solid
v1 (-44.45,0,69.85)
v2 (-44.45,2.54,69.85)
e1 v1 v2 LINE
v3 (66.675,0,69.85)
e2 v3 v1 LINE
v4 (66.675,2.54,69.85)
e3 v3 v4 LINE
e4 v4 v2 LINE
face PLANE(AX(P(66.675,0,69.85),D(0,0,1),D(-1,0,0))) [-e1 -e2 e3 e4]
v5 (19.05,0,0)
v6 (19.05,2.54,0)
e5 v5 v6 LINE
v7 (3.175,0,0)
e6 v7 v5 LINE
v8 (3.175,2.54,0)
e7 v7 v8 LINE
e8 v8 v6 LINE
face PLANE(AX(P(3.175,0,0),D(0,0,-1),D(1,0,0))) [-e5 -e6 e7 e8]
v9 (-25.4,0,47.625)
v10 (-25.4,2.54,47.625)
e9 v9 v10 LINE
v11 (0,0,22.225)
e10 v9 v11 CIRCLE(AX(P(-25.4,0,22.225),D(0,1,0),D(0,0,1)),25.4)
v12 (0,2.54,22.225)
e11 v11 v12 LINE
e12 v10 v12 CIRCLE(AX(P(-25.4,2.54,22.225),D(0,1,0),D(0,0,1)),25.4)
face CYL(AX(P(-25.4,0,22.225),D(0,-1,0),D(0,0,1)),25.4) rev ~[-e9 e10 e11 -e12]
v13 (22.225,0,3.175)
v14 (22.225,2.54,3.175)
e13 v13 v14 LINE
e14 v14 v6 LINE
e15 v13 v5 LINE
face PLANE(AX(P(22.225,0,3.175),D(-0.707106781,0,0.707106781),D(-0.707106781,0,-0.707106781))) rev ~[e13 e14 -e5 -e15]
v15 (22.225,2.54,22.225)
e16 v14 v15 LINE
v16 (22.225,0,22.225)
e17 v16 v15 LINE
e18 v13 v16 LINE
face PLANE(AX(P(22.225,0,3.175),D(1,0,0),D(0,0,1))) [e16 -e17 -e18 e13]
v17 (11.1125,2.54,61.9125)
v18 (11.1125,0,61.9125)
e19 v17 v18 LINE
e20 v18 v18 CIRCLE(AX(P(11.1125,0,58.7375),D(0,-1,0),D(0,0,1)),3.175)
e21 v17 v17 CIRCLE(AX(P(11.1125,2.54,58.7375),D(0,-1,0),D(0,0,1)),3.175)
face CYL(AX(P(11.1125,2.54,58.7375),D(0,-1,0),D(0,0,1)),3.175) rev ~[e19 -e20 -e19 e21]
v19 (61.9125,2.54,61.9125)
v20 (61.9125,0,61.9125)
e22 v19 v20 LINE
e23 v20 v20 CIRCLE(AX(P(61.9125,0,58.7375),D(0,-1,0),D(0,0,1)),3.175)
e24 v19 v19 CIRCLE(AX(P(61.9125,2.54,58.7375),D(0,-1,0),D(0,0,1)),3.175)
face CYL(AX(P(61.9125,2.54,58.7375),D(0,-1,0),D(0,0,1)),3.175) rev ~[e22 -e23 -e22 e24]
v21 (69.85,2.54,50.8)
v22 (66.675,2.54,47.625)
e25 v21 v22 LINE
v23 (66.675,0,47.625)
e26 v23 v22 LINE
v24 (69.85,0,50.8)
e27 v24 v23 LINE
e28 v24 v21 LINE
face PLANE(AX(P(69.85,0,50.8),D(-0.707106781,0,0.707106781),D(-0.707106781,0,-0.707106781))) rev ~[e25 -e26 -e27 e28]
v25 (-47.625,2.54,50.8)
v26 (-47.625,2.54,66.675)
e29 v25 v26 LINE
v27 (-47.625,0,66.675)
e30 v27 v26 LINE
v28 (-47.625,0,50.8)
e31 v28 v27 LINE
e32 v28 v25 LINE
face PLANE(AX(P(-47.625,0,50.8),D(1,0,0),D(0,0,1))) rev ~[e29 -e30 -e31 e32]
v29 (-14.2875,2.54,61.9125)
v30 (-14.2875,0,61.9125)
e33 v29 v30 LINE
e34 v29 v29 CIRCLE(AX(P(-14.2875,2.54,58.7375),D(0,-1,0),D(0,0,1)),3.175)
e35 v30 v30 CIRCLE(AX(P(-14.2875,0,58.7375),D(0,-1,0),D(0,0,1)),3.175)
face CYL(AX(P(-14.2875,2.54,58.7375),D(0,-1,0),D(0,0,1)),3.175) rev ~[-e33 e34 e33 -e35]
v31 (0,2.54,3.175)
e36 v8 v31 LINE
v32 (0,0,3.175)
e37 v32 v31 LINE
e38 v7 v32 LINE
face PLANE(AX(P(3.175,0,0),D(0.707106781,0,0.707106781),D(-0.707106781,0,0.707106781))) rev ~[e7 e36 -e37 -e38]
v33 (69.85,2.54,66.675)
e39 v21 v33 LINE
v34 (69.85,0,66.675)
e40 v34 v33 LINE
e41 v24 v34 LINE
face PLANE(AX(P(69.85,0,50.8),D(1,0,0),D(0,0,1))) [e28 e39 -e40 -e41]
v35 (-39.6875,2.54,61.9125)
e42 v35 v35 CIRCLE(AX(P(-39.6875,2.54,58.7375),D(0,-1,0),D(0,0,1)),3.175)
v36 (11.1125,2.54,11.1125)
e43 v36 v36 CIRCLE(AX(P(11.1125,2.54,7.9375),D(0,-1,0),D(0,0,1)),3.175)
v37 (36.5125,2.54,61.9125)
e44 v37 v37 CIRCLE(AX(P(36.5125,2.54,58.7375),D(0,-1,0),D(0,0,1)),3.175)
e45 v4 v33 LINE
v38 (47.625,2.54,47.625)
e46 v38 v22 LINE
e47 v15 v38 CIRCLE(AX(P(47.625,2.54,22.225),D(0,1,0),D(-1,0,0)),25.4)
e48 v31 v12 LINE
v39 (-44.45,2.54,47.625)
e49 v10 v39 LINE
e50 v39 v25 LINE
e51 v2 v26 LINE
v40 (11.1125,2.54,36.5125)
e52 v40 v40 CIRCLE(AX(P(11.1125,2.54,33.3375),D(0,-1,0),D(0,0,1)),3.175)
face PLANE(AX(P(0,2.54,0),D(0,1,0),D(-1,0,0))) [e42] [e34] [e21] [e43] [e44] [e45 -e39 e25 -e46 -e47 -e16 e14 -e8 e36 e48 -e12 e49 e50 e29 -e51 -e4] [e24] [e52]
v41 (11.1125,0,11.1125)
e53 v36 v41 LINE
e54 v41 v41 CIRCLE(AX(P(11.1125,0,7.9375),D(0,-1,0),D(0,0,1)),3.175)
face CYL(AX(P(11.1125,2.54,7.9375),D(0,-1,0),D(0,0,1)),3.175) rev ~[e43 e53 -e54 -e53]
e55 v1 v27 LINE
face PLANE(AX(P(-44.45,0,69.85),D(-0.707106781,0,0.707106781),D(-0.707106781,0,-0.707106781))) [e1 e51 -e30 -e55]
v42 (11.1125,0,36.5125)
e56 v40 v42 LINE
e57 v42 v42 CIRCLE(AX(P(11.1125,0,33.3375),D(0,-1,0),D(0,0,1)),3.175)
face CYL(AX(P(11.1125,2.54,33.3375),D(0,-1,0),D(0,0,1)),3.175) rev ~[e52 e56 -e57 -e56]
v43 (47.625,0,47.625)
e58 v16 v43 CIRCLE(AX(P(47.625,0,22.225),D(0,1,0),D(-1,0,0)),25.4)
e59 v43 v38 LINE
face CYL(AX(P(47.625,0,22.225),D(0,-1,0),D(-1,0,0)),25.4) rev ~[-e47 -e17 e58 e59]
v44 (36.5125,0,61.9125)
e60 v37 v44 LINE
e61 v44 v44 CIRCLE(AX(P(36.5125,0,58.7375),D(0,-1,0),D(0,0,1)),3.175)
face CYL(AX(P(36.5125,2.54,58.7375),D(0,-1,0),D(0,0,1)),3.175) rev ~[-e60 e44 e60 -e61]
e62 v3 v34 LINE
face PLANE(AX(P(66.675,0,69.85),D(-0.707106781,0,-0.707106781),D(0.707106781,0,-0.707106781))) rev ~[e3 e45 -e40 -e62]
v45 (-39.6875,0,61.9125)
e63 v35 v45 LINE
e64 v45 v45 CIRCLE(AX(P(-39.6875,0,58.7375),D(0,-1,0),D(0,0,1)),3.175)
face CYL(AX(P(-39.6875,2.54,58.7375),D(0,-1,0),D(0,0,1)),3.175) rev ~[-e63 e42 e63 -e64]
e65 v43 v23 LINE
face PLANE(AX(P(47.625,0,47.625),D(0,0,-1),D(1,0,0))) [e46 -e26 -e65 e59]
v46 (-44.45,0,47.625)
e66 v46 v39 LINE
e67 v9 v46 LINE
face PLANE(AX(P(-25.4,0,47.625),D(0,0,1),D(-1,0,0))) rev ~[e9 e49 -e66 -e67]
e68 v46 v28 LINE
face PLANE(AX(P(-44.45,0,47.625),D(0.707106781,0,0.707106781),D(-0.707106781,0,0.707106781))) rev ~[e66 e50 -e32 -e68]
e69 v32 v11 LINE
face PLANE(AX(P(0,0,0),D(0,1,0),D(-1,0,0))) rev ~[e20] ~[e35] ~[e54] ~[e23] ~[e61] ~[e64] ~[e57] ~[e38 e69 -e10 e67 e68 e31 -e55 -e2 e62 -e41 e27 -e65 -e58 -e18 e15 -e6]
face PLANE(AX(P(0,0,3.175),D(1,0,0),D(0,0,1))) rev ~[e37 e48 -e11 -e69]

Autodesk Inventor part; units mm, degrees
ref_plane "YZ Plane" through (0, 0, 0) normal (1, 0, 0) x (0, 1, 0)
ref_plane "XZ Plane" through (0, 0, 0) normal (0, 1, 0) x (-1, 0, 0)
ref_plane "XY Plane" through (0, 0, 0) normal (0, 0, 1) x (1, 0, 0)
sketch "Sketch1" plane through (0, 0, 0) normal (0, 1, 0) x (-1, 0, 0)
  line L0 (-3.175, 0) -> (-19.05, 0)
  line L1 (-69.85, 50.8) -> (-69.85, 66.675)
  line L2 (-66.675, 69.85) -> (44.45, 69.85)
  line L3 (-66.675, 69.85) -> (-69.85, 66.675)
  line L4 (-22.225, 3.175) -> (-22.225, 22.225)
  line L5 (-47.625, 47.625) -> (-66.675, 47.625)
  arc A0 (-22.225, 22.225) -> (-47.625, 47.625) centre (-47.625, 22.225) ccw
  line L6 (-22.225, 3.175) -> (-19.05, 0)
  line L7 (-69.85, 50.8) -> (-66.675, 47.625)
  line L8 (0, 3.175) -> (0, 22.225)
  line L9 (25.4, 47.625) -> (44.45, 47.625)
  line L10 (47.625, 50.8) -> (47.625, 66.675)
  arc A1 (25.4, 47.625) -> (0, 22.225) centre (25.4, 22.225) ccw
  line L11 (44.45, 69.85) -> (47.625, 66.675)
  line L12 (44.45, 47.625) -> (47.625, 50.8)
  line L13 (-3.175, 0) -> (0, 3.175)
  point P0 (0, 0)
  point P1 (-69.85, 69.85)
  point P2 (-3.175, 0)
  point P3 (0, 0)
  point P4 (-22.225, 47.625)
  point P5 (-22.225, 0)
  point P6 (-69.85, 47.625)
  point P7 (52.01, 70.1655)
  point P8 (52.01, 44.7655)
  point P9 (5.867, 46.0375)
  point P10 (5.867, 11.0567)
  point P11 (0, 47.625)
  point P12 (41.275, 47.625)
  point P13 (47.625, 44.45)
  point P14 (47.625, 63.5)
  point P15 (47.625, 69.85)
  point P16 (47.625, 47.625)
  point P17 (0, 0)
  dimension "d6" = 3.175
  dimension "d7" = 3.175
  dimension "d10" = 25.4
  dimension "d11" = 3.175
  dimension "d12" = 3.175
  dimension "d13" = 3.175
  dimension "d14" = 3.175
  dimension "d39" = 19.05
  dimension "d40" = 19.05
  dimension "d44" = 22.225
  dimension "d45" = 25.4
  dimension "d46" = 3.175
  dimension "d47" = 3.175
  dimension "d48" = 3.175
  dimension "d49" = 3.175
  dimension "d50" = 19.05
  dimension "d56" = 22.225
  dimension "d57" = 22.225
  dimension "d58" = 3.175
  dimension "d59" = 3.175
extrude "Extrusion1" add sketch "Sketch1" along normal blind 2.54
hole "Hole1" at (11.1125, 2.54, 58.7375) direction (0, -1, 0) diameter 6.35 end through all
pattern_linear "Rectangular Pattern1" count 5 spacing 25.4 along (1, 0, 0) of "Hole1" first direction both ways yes
pattern_linear "Rectangular Pattern2" count 3 spacing 25.4 along (0, 0, -1) of "Hole1"
equation "\"d6\" = d2"
equation "\"d7\" = d6"
equation "\"d12\" = d11"
equation "\"d13\" = d11"
equation "\"d14\" = d13"
equation "\"d39\" = d50"
equation "\"d40\" = d50"
equation "\"d47\" = d46"
equation "\"d48\" = d46"
equation "\"d49\" = d48"
equation "\"d57\" = d44"
equation "\"d59\" = d58"
equation "\"BendRadius\" = Thickness"
equation "\"BendReliefWidth\" = Thickness"
equation "\"BendReliefDepth\" = 0.5 * Thickness"
equation "\"CornerReliefSize\" = 4 * Thickness"
equation "\"MinimumRemnant\" = 2 * Thickness"
equation "\"TransitionRadius\" = BendRadius"
equation "\"JacobiRadiusSize\" = Thickness"
equation "\"GapSize\" = Thickness"
equation "\"Thickness\" = 3.048"
equation "\"d2\" = 3.175"
properties part number "3x5 T"
